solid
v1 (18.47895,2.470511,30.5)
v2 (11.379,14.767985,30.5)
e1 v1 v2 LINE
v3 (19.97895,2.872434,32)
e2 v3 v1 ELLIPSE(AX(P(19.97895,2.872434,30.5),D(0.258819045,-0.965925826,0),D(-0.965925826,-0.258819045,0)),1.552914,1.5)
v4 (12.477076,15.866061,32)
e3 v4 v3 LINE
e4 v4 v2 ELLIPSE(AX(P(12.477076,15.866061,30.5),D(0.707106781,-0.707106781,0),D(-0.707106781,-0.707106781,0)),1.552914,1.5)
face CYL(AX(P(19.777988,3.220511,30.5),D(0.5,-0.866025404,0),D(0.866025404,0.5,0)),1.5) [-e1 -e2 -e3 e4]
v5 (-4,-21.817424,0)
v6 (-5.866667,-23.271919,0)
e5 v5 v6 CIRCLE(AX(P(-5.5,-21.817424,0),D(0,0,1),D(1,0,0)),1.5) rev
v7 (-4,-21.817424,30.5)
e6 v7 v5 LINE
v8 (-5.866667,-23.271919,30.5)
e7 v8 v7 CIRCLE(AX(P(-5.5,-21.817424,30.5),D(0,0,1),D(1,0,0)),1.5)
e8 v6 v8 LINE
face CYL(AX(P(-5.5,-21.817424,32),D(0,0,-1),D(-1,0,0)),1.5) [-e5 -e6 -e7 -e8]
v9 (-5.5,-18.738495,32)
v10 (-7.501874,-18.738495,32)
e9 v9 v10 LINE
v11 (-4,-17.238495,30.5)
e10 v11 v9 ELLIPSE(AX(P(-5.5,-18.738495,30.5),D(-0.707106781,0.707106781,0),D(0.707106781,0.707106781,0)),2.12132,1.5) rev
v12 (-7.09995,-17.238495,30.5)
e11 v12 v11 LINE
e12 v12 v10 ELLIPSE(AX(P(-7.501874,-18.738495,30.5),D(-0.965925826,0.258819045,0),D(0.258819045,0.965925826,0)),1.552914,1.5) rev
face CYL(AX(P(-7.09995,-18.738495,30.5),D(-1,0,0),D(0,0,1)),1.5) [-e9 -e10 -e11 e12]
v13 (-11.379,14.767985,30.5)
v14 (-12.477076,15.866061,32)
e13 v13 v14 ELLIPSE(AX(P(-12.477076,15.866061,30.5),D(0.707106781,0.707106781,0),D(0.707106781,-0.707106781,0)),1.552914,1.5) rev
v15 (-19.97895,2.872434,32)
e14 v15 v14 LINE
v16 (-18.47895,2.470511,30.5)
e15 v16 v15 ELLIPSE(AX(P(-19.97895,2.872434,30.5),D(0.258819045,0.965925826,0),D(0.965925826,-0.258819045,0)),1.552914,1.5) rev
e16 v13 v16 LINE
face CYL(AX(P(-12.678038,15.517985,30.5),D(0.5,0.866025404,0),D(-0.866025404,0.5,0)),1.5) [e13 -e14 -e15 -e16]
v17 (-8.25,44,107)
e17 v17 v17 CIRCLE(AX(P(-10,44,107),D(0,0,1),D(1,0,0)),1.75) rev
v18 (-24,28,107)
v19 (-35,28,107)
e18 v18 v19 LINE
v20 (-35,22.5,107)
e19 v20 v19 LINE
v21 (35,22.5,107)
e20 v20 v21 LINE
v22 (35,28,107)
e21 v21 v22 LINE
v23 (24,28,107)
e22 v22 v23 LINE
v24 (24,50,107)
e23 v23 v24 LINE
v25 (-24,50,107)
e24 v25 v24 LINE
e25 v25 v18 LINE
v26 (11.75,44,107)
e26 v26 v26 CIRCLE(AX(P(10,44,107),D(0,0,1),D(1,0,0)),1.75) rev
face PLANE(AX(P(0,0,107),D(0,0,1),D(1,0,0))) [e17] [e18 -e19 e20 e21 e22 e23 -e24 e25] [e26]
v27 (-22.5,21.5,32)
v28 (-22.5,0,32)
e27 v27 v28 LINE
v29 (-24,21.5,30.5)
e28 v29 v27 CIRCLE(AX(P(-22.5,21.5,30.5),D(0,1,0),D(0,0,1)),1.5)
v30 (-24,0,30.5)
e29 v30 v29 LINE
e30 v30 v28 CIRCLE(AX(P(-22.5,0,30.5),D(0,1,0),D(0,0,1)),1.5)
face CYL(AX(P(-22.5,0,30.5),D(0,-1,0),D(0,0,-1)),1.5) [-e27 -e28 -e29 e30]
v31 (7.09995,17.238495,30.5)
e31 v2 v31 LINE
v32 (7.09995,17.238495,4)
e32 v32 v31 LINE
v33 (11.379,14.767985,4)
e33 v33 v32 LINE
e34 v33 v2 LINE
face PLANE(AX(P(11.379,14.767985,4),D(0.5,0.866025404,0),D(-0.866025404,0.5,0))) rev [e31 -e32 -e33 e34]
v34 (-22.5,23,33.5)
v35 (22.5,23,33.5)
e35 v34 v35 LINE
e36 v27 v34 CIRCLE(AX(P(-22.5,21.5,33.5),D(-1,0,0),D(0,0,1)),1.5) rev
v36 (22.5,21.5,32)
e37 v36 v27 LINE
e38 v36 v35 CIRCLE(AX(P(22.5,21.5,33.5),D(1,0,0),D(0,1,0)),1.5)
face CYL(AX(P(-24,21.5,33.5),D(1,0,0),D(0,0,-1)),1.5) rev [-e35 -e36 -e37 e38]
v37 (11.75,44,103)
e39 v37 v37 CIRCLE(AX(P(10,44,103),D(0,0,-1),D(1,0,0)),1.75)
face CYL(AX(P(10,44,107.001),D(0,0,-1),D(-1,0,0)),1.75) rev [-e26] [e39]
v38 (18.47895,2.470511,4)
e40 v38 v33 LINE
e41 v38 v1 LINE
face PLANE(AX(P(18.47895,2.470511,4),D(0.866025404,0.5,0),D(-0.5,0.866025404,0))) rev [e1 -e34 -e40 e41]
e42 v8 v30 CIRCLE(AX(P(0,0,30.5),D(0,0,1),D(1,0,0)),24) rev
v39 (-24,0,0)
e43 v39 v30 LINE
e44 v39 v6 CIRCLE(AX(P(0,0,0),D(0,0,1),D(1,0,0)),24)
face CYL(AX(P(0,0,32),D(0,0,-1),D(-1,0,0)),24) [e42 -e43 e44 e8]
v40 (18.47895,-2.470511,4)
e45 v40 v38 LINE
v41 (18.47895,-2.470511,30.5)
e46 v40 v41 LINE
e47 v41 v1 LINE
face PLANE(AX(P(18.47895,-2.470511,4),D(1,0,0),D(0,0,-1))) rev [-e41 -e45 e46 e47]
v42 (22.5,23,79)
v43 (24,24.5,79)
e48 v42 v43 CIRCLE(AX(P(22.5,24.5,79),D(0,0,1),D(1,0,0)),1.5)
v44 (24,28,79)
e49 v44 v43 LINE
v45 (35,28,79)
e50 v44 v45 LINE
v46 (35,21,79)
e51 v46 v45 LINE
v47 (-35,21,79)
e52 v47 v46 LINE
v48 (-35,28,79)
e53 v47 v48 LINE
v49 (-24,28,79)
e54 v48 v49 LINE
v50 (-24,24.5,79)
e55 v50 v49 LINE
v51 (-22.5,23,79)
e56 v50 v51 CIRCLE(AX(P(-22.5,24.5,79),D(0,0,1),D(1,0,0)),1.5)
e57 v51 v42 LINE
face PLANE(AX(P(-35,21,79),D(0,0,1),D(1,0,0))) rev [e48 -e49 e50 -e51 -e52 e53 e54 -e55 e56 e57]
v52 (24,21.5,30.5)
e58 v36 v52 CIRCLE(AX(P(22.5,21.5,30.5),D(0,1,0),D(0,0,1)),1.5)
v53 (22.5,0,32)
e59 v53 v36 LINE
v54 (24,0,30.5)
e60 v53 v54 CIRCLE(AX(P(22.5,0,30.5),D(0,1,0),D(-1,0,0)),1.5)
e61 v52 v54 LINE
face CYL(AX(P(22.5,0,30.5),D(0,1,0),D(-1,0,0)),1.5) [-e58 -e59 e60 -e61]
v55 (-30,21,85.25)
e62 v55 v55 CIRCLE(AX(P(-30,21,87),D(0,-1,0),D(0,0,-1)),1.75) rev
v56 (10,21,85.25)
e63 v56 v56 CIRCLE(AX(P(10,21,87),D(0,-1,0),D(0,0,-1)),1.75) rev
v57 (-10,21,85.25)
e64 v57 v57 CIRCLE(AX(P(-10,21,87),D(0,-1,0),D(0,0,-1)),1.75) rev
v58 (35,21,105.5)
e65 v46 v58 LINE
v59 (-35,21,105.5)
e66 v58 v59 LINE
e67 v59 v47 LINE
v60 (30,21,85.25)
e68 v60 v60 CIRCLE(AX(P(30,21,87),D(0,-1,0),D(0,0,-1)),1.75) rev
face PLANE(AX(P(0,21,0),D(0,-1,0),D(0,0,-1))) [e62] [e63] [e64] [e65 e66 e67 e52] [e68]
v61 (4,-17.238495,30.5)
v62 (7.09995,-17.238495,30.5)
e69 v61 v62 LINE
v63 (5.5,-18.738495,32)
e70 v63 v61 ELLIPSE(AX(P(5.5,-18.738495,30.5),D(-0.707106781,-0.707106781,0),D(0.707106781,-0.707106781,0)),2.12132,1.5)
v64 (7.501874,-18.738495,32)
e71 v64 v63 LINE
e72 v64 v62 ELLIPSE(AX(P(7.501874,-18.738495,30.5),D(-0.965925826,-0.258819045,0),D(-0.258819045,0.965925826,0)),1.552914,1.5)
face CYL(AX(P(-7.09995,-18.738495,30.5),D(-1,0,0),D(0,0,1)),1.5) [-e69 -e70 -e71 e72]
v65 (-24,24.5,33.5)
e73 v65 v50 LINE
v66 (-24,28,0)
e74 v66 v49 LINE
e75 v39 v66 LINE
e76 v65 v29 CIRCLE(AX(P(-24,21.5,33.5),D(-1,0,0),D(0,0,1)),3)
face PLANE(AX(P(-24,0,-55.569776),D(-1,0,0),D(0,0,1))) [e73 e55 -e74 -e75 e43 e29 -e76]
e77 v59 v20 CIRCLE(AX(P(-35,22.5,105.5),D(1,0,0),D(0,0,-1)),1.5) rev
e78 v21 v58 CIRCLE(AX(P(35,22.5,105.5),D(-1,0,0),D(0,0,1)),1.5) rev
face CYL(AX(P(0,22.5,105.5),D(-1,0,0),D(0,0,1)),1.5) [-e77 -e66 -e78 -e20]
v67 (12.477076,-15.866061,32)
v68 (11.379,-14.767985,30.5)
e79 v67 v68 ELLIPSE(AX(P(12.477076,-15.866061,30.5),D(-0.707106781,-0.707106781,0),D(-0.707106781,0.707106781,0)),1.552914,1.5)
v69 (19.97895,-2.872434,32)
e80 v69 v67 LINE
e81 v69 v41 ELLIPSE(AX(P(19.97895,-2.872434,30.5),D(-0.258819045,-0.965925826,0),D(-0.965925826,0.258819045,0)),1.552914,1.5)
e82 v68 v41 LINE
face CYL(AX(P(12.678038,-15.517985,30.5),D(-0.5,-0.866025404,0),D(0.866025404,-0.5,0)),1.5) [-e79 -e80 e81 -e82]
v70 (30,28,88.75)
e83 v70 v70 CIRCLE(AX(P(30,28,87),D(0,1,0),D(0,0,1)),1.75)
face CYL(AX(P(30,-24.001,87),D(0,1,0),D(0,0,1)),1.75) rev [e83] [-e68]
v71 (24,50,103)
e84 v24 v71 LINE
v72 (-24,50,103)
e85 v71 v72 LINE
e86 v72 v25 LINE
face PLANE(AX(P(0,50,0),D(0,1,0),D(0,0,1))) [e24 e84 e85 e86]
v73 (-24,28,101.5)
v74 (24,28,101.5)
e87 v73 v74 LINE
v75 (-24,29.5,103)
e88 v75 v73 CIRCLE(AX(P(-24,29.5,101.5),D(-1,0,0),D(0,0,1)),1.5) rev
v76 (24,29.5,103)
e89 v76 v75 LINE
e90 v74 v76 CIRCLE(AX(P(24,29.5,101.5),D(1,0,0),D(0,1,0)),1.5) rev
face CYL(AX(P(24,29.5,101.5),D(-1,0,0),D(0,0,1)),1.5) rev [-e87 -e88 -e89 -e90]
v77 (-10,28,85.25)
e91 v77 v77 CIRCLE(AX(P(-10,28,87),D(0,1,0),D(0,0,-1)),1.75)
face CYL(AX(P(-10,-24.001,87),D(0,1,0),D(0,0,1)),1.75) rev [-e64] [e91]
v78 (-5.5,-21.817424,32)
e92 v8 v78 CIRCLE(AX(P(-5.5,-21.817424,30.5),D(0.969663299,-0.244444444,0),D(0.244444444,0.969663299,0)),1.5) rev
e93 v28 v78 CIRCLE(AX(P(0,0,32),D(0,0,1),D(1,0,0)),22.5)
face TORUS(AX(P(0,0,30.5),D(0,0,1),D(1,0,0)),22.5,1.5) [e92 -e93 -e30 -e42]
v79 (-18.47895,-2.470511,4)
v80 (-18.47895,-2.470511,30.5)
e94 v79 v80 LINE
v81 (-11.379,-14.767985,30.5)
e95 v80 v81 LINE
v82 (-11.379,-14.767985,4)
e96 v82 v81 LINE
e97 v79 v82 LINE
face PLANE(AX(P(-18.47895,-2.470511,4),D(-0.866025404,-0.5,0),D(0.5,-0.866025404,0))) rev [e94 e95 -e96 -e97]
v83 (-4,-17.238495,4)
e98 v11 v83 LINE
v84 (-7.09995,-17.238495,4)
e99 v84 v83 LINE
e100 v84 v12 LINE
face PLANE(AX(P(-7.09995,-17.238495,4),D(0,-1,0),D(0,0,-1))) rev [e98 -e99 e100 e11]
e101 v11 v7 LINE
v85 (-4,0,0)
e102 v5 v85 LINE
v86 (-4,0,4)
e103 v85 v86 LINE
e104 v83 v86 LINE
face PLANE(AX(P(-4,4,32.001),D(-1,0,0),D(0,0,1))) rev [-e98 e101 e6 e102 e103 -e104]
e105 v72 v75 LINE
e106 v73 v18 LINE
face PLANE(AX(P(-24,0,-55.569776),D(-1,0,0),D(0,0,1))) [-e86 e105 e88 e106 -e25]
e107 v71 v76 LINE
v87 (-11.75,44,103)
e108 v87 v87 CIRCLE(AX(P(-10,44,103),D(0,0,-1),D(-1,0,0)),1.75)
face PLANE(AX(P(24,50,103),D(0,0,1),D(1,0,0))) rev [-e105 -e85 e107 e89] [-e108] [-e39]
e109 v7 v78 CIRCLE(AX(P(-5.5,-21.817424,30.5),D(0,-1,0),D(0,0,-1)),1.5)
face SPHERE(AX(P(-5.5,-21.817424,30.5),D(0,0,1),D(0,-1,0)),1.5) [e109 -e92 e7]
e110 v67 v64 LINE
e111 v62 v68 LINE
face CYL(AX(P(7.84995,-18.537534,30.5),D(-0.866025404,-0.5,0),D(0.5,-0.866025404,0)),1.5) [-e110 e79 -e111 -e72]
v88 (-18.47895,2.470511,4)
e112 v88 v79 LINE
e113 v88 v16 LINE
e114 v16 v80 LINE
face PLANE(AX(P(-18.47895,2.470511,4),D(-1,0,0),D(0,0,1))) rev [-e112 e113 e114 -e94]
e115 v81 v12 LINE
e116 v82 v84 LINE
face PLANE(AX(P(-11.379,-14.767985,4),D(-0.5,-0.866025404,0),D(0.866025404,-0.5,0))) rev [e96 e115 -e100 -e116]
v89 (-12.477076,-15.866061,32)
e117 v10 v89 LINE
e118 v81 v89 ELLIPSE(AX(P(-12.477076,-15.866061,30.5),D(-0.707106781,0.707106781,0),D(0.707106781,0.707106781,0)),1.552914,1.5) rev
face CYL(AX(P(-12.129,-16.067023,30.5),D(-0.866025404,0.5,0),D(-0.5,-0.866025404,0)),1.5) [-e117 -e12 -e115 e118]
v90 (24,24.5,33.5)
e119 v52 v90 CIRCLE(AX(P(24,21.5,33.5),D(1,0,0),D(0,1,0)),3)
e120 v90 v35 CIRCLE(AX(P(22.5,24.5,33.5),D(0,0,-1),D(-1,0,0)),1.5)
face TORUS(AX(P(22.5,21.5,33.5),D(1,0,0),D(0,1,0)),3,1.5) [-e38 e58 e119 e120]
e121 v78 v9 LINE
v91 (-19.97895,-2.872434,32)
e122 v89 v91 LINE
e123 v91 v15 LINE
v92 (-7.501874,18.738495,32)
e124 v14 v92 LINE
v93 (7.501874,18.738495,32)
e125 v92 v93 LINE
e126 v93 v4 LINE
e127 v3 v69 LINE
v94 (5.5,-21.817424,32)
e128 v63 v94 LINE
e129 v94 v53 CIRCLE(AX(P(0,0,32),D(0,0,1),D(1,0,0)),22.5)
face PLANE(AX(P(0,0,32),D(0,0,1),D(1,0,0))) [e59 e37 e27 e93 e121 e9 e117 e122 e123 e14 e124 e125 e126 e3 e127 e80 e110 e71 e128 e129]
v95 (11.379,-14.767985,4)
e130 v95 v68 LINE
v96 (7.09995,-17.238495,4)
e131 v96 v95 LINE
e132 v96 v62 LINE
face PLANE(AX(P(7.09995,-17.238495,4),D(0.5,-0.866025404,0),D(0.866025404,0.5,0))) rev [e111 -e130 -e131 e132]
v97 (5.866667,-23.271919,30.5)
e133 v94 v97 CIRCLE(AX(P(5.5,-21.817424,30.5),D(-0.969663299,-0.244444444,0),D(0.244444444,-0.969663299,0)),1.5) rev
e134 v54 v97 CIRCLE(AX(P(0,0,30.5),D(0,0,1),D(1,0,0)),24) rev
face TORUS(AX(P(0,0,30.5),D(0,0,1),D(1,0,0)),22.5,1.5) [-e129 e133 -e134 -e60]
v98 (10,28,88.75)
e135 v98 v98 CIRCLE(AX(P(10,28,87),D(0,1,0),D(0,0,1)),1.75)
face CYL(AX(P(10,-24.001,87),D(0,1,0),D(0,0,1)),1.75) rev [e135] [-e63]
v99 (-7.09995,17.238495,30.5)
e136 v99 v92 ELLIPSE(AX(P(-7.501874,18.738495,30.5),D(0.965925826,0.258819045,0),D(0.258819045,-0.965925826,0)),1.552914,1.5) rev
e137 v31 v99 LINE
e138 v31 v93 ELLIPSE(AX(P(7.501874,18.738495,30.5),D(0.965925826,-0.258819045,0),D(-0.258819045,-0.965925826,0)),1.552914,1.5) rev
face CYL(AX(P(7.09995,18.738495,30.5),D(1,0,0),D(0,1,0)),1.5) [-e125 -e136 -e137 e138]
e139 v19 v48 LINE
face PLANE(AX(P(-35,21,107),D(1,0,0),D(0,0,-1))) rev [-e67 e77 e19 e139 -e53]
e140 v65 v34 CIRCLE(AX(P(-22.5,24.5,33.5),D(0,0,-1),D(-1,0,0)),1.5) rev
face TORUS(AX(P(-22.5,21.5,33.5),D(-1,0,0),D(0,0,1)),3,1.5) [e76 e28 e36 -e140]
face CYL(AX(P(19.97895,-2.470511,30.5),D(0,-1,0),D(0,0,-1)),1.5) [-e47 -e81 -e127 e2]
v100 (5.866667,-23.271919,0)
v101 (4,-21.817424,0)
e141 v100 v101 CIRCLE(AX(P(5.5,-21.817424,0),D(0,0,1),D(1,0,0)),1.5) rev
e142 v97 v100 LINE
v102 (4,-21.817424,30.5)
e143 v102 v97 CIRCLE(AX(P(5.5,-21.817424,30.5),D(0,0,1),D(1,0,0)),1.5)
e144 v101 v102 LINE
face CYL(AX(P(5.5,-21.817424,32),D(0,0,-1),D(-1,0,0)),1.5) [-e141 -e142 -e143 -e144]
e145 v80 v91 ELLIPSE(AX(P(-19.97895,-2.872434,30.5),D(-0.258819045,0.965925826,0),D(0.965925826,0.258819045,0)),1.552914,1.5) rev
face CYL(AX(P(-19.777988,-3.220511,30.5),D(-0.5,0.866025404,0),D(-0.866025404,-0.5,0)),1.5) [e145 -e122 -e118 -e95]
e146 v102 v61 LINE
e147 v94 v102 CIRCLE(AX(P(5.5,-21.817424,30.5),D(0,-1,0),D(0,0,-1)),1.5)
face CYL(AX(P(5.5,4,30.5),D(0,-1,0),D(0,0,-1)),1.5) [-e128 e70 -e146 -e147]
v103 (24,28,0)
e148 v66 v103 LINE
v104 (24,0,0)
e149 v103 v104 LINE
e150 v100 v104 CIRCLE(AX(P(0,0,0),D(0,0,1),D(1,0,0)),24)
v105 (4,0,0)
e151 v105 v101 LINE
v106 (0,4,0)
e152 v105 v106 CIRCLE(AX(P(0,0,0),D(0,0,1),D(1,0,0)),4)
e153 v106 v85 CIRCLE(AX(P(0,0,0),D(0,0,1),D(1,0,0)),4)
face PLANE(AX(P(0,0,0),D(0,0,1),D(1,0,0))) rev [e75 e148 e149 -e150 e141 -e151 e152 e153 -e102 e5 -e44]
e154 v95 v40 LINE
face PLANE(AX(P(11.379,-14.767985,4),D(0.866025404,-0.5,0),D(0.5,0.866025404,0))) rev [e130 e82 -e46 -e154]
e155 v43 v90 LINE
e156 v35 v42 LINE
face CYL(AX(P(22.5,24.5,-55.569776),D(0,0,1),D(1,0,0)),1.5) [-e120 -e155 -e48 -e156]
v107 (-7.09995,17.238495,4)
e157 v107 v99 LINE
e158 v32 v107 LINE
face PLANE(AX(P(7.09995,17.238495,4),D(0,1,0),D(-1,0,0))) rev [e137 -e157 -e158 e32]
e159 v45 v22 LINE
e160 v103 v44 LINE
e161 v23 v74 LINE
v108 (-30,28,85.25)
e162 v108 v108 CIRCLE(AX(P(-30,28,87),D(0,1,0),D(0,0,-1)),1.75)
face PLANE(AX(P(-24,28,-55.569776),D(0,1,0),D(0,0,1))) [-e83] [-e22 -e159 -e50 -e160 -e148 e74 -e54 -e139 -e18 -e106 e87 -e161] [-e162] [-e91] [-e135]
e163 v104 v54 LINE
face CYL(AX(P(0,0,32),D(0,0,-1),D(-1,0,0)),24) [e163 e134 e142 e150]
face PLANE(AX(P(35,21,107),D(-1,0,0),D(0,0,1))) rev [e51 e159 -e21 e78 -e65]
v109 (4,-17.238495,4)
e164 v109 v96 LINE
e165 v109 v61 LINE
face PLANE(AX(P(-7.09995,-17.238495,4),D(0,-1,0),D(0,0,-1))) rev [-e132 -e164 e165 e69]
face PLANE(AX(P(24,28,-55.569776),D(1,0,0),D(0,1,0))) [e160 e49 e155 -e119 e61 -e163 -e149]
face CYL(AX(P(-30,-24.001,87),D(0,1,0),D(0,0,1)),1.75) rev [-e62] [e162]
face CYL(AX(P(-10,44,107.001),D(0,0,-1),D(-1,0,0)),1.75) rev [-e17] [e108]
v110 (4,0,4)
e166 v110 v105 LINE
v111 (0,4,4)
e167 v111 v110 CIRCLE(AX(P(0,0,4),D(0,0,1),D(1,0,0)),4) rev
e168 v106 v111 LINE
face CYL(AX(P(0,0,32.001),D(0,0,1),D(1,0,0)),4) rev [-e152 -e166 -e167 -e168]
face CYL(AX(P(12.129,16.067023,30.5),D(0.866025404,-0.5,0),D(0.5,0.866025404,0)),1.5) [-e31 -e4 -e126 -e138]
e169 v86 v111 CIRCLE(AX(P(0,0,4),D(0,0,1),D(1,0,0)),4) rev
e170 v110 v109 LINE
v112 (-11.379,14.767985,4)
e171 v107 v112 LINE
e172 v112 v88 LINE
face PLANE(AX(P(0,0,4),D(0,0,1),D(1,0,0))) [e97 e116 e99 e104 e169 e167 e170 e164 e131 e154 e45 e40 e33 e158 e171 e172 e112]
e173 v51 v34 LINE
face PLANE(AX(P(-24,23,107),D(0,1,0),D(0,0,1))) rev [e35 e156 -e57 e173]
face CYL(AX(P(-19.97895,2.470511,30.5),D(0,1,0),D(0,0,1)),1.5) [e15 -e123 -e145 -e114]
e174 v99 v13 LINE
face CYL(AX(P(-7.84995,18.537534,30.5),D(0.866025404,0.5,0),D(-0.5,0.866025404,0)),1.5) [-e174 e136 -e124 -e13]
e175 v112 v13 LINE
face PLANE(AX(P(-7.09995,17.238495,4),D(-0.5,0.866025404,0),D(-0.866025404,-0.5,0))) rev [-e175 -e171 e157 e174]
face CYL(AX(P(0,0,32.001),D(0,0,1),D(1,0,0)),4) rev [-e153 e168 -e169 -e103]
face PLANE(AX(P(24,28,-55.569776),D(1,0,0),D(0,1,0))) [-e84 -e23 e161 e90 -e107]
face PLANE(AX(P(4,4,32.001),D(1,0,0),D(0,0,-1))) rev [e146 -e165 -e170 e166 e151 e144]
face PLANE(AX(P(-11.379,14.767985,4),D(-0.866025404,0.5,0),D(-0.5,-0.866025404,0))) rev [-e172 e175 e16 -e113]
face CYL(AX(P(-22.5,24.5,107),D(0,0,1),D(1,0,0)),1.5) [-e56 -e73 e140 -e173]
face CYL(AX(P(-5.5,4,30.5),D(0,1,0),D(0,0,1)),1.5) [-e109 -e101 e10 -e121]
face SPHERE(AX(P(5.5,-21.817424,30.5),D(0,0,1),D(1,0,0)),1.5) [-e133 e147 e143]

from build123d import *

# Parameters (mm, degrees)
SKETCH1_R                = 24
BOSS_EXTRUDE2_DEPTH      = 32
CUT_EXTRUDE1_DEPTH       = 28
CUT_EXTRUDE2_REACH       = 48.648
SKETCH3_W                = 8
SKETCH3_H                = 8
BOSS_EXTRUDE3_DEPTH      = 32
SKETCH6_W                = 48
SKETCH6_H                = 5
BOSS_EXTRUDE4_DEPTH      = 75
SKETCH7_W                = 48
SKETCH7_H                = 4
BOSS_EXTRUDE5_DEPTH      = 22
CUT_EXTRUDE3_REACH       = 118.983
SKETCH8_R                = 1.75
BOSS_EXTRUDE7_DEPTH      = 2
BOSS_EXTRUDE7_DEPTH_BACK = 5
SKETCH11_W               = 70
SKETCH11_H               = 28
CUT_EXTRUDE5_REACH       = 126.008
SKETCH12_R               = 1.75
CUT_EXTRUDE6_DEPTH       = 97.695398029
FILLET2_R                = 1.5
FILLET3_R                = 4


with BuildPart() as part:
    # Sketch1 → Boss-Extrude2 (new body)
    with BuildSketch(Plane(origin=(0, 0, 0), x_dir=(0, 1, 0), z_dir=(0, 0, 1))):
        with Locations(Location((0, 0, 0), (0, 0, 270))):
            Circle(SKETCH1_R)
    extrude(amount=BOSS_EXTRUDE2_DEPTH)

    # Sketch2 → Cut-Extrude1 (cut)
    with BuildSketch(Plane.XY.offset(32)):
        Polygon((7.09995, 17.23849547), (-7.09995, 17.23849547), (-11.379, 14.767984801), (-18.47895, 2.470510669), (-18.47895, -2.470510669), (-11.379, -14.767984801), (-7.09995, -17.23849547), (7.09995, -17.23849547), (11.379, -14.767984801), (18.47895, -2.470510669), (18.47895, 2.470510669), (11.379, 14.767984801), align=None)
    extrude(amount=-CUT_EXTRUDE1_DEPTH, mode=Mode.SUBTRACT)

    # Sketch3 → Cut-Extrude2 (cut, up to next)
    with BuildSketch(Plane(origin=(0, 0, 0), x_dir=(1, 0, 0), z_dir=(0, 0, -1)), mode=Mode.PRIVATE) as cut_extrude2_sk1:
        Rectangle(SKETCH3_W, SKETCH3_H)
    cut_extrude2_tool1 = extrude(cut_extrude2_sk1.sketch, amount=-CUT_EXTRUDE2_REACH, mode=Mode.PRIVATE) & part.part
    add(cut_extrude2_tool1.solids().sort_by_distance((0, 0, 0))[0], mode=Mode.SUBTRACT)

    # Sketch4 → Boss-Extrude3 (add)
    with BuildSketch(Plane.XY.offset(32)):
        with BuildLine():
            Line((-24, 0), (-24, 28))
            Line((-24, 28), (24, 28))
            Line((24, 28), (24, 0))
            Line((24, 0), (22, 0))
            ThreePointArc((22, 0), (0, 22), (-22, 0))
            Line((-22, 0), (-24, 0))
        make_face()
    extrude(amount=-BOSS_EXTRUDE3_DEPTH)

    # Sketch6 → Boss-Extrude4 (add)
    with BuildSketch(Plane.XY.offset(32)):
        with Locations((0, 25.5)):
            Rectangle(SKETCH6_W, SKETCH6_H)
    extrude(amount=BOSS_EXTRUDE4_DEPTH)

    # Sketch7 → Boss-Extrude5 (add)
    with BuildSketch(Plane(origin=(0, 28, 0), x_dir=(-1, 0, 0), z_dir=(0, 1, 0))):
        with Locations((0, 105)):
            Rectangle(SKETCH7_W, SKETCH7_H)
    extrude(amount=BOSS_EXTRUDE5_DEPTH)

    # Sketch8 → Cut-Extrude3 (cut, up to next)
    with BuildSketch(Plane(origin=(0, 0, 103), x_dir=(1, 0, 0), z_dir=(0, 0, -1)), mode=Mode.PRIVATE) as cut_extrude3_sk1:
        with Locations(Location((-10, -44, 0), (0, 0, 180))):
            Circle(SKETCH8_R)
    cut_extrude3_tool1 = extrude(cut_extrude3_sk1.sketch, amount=-CUT_EXTRUDE3_REACH, mode=Mode.PRIVATE) & part.part
    # Sketch8 → Cut-Extrude3 (cut, up to next)
    with BuildSketch(Plane(origin=(0, 0, 103), x_dir=(1, 0, 0), z_dir=(0, 0, -1)), mode=Mode.PRIVATE) as cut_extrude3_sk2:
        with Locations((10, -44)):
            Circle(SKETCH8_R)
    cut_extrude3_tool2 = extrude(cut_extrude3_sk2.sketch, amount=-CUT_EXTRUDE3_REACH, mode=Mode.PRIVATE) & part.part
    add(cut_extrude3_tool1.solids().sort_by_distance((-10, 44, 103))[0], mode=Mode.SUBTRACT)
    add(cut_extrude3_tool2.solids().sort_by_distance((10, 44, 103))[0], mode=Mode.SUBTRACT)

    # Sketch11 → Boss-Extrude7 (add, two sides: drawn at the far end of the back side and taken through both)
    with BuildSketch(Plane.XZ.offset(-23).offset(-BOSS_EXTRUDE7_DEPTH_BACK)):
        with Locations((0, 93)):
            Rectangle(SKETCH11_W, SKETCH11_H)
    extrude(amount=BOSS_EXTRUDE7_DEPTH + BOSS_EXTRUDE7_DEPTH_BACK)

    # Sketch12 → Cut-Extrude5 (cut, up to next)
    with BuildSketch(Plane(origin=(0, 28, 0), x_dir=(-1, 0, 0), z_dir=(0, 1, 0)), mode=Mode.PRIVATE) as cut_extrude5_sk1:
        with Locations(Location((-10, 87, 0), (0, 0, 90))):
            Circle(SKETCH12_R)
    cut_extrude5_tool1 = extrude(cut_extrude5_sk1.sketch, amount=-CUT_EXTRUDE5_REACH, mode=Mode.PRIVATE) & part.part
    # Sketch12 → Cut-Extrude5 (cut, up to next)
    with BuildSketch(Plane(origin=(0, 28, 0), x_dir=(-1, 0, 0), z_dir=(0, 1, 0)), mode=Mode.PRIVATE) as cut_extrude5_sk2:
        with Locations(Location((-30, 87, 0), (0, 0, 90))):
            Circle(SKETCH12_R)
    cut_extrude5_tool2 = extrude(cut_extrude5_sk2.sketch, amount=-CUT_EXTRUDE5_REACH, mode=Mode.PRIVATE) & part.part
    # Sketch12 → Cut-Extrude5 (cut, up to next)
    with BuildSketch(Plane(origin=(0, 28, 0), x_dir=(-1, 0, 0), z_dir=(0, 1, 0)), mode=Mode.PRIVATE) as cut_extrude5_sk3:
        with Locations(Location((10, 87, 0), (0, 0, 270))):
            Circle(SKETCH12_R)
    cut_extrude5_tool3 = extrude(cut_extrude5_sk3.sketch, amount=-CUT_EXTRUDE5_REACH, mode=Mode.PRIVATE) & part.part
    # Sketch12 → Cut-Extrude5 (cut, up to next)
    with BuildSketch(Plane(origin=(0, 28, 0), x_dir=(-1, 0, 0), z_dir=(0, 1, 0)), mode=Mode.PRIVATE) as cut_extrude5_sk4:
        with Locations(Location((30, 87, 0), (0, 0, 270))):
            Circle(SKETCH12_R)
    cut_extrude5_tool4 = extrude(cut_extrude5_sk4.sketch, amount=-CUT_EXTRUDE5_REACH, mode=Mode.PRIVATE) & part.part
    add(cut_extrude5_tool1.solids().sort_by_distance((10, 28, 87))[0], mode=Mode.SUBTRACT)
    add(cut_extrude5_tool2.solids().sort_by_distance((30, 28, 87))[0], mode=Mode.SUBTRACT)
    add(cut_extrude5_tool3.solids().sort_by_distance((-10, 28, 87))[0], mode=Mode.SUBTRACT)
    add(cut_extrude5_tool4.solids().sort_by_distance((-30, 28, 87))[0], mode=Mode.SUBTRACT)

    # Sketch13 → Cut-Extrude6 (cut, through all)
    with BuildSketch(Plane.XY.offset(32)):
        with BuildLine():
            Line((-4, -4), (-4, -23.664319132))
            ThreePointArc((-4, -23.664319132), (0, -24), (4, -23.664319132))
            Line((4, -23.664319132), (4, -4))
            Line((4, -4), (-4, -4))
        make_face()
    extrude(amount=-CUT_EXTRUDE6_DEPTH, mode=Mode.SUBTRACT)

    # Fillet2
    fillet2_edges = [part.edges().sort_by_distance(p)[0] for p in [
        (24, 23, 55.5),
        (-24, 23, 55.5),
        (0, 21, 107),
        (-9.239475, 16.003240135, 32),
        (-14.928975, 8.619247735, 32),
        (5.549975, -17.23849547, 32),
        (-18.47895, 0, 32),
        (18.33030278, -15.491933385, 32),
        (-14.928975, -8.619247735, 32),
        (-4, -20.451407301, 32),
        (4, -20.451407301, 32),
        (-9.239475, -16.003240135, 32),
        (4, -23.664319132, 16),
        (-4, -23.664319132, 16),
        (-5.549975, -17.23849547, 32),
        (9.239475, -16.003240135, 32),
        (14.928975, -8.619247735, 32),
        (18.47895, 0, 32),
        (14.928975, 8.619247735, 32),
        (9.239475, 16.003240135, 32),
        (0, 17.23849547, 32),
        (-18.33030278, -15.491933385, 32),
        (24, 11.5, 32),
        (-24, 11.5, 32),
        (0, 23, 32),
        (0, 28, 103),
    ]]
    fillet(fillet2_edges, radius=FILLET2_R)

    # Fillet3
    fillet3_edges = [part.edges().sort_by_distance(p)[0] for p in [
        (-4, 4, 2),
        (4, 4, 2),
    ]]
    fillet(fillet3_edges, radius=FILLET3_R - 0.0001)  # a hair under: the kernel refuses the full size


solid = part.part
